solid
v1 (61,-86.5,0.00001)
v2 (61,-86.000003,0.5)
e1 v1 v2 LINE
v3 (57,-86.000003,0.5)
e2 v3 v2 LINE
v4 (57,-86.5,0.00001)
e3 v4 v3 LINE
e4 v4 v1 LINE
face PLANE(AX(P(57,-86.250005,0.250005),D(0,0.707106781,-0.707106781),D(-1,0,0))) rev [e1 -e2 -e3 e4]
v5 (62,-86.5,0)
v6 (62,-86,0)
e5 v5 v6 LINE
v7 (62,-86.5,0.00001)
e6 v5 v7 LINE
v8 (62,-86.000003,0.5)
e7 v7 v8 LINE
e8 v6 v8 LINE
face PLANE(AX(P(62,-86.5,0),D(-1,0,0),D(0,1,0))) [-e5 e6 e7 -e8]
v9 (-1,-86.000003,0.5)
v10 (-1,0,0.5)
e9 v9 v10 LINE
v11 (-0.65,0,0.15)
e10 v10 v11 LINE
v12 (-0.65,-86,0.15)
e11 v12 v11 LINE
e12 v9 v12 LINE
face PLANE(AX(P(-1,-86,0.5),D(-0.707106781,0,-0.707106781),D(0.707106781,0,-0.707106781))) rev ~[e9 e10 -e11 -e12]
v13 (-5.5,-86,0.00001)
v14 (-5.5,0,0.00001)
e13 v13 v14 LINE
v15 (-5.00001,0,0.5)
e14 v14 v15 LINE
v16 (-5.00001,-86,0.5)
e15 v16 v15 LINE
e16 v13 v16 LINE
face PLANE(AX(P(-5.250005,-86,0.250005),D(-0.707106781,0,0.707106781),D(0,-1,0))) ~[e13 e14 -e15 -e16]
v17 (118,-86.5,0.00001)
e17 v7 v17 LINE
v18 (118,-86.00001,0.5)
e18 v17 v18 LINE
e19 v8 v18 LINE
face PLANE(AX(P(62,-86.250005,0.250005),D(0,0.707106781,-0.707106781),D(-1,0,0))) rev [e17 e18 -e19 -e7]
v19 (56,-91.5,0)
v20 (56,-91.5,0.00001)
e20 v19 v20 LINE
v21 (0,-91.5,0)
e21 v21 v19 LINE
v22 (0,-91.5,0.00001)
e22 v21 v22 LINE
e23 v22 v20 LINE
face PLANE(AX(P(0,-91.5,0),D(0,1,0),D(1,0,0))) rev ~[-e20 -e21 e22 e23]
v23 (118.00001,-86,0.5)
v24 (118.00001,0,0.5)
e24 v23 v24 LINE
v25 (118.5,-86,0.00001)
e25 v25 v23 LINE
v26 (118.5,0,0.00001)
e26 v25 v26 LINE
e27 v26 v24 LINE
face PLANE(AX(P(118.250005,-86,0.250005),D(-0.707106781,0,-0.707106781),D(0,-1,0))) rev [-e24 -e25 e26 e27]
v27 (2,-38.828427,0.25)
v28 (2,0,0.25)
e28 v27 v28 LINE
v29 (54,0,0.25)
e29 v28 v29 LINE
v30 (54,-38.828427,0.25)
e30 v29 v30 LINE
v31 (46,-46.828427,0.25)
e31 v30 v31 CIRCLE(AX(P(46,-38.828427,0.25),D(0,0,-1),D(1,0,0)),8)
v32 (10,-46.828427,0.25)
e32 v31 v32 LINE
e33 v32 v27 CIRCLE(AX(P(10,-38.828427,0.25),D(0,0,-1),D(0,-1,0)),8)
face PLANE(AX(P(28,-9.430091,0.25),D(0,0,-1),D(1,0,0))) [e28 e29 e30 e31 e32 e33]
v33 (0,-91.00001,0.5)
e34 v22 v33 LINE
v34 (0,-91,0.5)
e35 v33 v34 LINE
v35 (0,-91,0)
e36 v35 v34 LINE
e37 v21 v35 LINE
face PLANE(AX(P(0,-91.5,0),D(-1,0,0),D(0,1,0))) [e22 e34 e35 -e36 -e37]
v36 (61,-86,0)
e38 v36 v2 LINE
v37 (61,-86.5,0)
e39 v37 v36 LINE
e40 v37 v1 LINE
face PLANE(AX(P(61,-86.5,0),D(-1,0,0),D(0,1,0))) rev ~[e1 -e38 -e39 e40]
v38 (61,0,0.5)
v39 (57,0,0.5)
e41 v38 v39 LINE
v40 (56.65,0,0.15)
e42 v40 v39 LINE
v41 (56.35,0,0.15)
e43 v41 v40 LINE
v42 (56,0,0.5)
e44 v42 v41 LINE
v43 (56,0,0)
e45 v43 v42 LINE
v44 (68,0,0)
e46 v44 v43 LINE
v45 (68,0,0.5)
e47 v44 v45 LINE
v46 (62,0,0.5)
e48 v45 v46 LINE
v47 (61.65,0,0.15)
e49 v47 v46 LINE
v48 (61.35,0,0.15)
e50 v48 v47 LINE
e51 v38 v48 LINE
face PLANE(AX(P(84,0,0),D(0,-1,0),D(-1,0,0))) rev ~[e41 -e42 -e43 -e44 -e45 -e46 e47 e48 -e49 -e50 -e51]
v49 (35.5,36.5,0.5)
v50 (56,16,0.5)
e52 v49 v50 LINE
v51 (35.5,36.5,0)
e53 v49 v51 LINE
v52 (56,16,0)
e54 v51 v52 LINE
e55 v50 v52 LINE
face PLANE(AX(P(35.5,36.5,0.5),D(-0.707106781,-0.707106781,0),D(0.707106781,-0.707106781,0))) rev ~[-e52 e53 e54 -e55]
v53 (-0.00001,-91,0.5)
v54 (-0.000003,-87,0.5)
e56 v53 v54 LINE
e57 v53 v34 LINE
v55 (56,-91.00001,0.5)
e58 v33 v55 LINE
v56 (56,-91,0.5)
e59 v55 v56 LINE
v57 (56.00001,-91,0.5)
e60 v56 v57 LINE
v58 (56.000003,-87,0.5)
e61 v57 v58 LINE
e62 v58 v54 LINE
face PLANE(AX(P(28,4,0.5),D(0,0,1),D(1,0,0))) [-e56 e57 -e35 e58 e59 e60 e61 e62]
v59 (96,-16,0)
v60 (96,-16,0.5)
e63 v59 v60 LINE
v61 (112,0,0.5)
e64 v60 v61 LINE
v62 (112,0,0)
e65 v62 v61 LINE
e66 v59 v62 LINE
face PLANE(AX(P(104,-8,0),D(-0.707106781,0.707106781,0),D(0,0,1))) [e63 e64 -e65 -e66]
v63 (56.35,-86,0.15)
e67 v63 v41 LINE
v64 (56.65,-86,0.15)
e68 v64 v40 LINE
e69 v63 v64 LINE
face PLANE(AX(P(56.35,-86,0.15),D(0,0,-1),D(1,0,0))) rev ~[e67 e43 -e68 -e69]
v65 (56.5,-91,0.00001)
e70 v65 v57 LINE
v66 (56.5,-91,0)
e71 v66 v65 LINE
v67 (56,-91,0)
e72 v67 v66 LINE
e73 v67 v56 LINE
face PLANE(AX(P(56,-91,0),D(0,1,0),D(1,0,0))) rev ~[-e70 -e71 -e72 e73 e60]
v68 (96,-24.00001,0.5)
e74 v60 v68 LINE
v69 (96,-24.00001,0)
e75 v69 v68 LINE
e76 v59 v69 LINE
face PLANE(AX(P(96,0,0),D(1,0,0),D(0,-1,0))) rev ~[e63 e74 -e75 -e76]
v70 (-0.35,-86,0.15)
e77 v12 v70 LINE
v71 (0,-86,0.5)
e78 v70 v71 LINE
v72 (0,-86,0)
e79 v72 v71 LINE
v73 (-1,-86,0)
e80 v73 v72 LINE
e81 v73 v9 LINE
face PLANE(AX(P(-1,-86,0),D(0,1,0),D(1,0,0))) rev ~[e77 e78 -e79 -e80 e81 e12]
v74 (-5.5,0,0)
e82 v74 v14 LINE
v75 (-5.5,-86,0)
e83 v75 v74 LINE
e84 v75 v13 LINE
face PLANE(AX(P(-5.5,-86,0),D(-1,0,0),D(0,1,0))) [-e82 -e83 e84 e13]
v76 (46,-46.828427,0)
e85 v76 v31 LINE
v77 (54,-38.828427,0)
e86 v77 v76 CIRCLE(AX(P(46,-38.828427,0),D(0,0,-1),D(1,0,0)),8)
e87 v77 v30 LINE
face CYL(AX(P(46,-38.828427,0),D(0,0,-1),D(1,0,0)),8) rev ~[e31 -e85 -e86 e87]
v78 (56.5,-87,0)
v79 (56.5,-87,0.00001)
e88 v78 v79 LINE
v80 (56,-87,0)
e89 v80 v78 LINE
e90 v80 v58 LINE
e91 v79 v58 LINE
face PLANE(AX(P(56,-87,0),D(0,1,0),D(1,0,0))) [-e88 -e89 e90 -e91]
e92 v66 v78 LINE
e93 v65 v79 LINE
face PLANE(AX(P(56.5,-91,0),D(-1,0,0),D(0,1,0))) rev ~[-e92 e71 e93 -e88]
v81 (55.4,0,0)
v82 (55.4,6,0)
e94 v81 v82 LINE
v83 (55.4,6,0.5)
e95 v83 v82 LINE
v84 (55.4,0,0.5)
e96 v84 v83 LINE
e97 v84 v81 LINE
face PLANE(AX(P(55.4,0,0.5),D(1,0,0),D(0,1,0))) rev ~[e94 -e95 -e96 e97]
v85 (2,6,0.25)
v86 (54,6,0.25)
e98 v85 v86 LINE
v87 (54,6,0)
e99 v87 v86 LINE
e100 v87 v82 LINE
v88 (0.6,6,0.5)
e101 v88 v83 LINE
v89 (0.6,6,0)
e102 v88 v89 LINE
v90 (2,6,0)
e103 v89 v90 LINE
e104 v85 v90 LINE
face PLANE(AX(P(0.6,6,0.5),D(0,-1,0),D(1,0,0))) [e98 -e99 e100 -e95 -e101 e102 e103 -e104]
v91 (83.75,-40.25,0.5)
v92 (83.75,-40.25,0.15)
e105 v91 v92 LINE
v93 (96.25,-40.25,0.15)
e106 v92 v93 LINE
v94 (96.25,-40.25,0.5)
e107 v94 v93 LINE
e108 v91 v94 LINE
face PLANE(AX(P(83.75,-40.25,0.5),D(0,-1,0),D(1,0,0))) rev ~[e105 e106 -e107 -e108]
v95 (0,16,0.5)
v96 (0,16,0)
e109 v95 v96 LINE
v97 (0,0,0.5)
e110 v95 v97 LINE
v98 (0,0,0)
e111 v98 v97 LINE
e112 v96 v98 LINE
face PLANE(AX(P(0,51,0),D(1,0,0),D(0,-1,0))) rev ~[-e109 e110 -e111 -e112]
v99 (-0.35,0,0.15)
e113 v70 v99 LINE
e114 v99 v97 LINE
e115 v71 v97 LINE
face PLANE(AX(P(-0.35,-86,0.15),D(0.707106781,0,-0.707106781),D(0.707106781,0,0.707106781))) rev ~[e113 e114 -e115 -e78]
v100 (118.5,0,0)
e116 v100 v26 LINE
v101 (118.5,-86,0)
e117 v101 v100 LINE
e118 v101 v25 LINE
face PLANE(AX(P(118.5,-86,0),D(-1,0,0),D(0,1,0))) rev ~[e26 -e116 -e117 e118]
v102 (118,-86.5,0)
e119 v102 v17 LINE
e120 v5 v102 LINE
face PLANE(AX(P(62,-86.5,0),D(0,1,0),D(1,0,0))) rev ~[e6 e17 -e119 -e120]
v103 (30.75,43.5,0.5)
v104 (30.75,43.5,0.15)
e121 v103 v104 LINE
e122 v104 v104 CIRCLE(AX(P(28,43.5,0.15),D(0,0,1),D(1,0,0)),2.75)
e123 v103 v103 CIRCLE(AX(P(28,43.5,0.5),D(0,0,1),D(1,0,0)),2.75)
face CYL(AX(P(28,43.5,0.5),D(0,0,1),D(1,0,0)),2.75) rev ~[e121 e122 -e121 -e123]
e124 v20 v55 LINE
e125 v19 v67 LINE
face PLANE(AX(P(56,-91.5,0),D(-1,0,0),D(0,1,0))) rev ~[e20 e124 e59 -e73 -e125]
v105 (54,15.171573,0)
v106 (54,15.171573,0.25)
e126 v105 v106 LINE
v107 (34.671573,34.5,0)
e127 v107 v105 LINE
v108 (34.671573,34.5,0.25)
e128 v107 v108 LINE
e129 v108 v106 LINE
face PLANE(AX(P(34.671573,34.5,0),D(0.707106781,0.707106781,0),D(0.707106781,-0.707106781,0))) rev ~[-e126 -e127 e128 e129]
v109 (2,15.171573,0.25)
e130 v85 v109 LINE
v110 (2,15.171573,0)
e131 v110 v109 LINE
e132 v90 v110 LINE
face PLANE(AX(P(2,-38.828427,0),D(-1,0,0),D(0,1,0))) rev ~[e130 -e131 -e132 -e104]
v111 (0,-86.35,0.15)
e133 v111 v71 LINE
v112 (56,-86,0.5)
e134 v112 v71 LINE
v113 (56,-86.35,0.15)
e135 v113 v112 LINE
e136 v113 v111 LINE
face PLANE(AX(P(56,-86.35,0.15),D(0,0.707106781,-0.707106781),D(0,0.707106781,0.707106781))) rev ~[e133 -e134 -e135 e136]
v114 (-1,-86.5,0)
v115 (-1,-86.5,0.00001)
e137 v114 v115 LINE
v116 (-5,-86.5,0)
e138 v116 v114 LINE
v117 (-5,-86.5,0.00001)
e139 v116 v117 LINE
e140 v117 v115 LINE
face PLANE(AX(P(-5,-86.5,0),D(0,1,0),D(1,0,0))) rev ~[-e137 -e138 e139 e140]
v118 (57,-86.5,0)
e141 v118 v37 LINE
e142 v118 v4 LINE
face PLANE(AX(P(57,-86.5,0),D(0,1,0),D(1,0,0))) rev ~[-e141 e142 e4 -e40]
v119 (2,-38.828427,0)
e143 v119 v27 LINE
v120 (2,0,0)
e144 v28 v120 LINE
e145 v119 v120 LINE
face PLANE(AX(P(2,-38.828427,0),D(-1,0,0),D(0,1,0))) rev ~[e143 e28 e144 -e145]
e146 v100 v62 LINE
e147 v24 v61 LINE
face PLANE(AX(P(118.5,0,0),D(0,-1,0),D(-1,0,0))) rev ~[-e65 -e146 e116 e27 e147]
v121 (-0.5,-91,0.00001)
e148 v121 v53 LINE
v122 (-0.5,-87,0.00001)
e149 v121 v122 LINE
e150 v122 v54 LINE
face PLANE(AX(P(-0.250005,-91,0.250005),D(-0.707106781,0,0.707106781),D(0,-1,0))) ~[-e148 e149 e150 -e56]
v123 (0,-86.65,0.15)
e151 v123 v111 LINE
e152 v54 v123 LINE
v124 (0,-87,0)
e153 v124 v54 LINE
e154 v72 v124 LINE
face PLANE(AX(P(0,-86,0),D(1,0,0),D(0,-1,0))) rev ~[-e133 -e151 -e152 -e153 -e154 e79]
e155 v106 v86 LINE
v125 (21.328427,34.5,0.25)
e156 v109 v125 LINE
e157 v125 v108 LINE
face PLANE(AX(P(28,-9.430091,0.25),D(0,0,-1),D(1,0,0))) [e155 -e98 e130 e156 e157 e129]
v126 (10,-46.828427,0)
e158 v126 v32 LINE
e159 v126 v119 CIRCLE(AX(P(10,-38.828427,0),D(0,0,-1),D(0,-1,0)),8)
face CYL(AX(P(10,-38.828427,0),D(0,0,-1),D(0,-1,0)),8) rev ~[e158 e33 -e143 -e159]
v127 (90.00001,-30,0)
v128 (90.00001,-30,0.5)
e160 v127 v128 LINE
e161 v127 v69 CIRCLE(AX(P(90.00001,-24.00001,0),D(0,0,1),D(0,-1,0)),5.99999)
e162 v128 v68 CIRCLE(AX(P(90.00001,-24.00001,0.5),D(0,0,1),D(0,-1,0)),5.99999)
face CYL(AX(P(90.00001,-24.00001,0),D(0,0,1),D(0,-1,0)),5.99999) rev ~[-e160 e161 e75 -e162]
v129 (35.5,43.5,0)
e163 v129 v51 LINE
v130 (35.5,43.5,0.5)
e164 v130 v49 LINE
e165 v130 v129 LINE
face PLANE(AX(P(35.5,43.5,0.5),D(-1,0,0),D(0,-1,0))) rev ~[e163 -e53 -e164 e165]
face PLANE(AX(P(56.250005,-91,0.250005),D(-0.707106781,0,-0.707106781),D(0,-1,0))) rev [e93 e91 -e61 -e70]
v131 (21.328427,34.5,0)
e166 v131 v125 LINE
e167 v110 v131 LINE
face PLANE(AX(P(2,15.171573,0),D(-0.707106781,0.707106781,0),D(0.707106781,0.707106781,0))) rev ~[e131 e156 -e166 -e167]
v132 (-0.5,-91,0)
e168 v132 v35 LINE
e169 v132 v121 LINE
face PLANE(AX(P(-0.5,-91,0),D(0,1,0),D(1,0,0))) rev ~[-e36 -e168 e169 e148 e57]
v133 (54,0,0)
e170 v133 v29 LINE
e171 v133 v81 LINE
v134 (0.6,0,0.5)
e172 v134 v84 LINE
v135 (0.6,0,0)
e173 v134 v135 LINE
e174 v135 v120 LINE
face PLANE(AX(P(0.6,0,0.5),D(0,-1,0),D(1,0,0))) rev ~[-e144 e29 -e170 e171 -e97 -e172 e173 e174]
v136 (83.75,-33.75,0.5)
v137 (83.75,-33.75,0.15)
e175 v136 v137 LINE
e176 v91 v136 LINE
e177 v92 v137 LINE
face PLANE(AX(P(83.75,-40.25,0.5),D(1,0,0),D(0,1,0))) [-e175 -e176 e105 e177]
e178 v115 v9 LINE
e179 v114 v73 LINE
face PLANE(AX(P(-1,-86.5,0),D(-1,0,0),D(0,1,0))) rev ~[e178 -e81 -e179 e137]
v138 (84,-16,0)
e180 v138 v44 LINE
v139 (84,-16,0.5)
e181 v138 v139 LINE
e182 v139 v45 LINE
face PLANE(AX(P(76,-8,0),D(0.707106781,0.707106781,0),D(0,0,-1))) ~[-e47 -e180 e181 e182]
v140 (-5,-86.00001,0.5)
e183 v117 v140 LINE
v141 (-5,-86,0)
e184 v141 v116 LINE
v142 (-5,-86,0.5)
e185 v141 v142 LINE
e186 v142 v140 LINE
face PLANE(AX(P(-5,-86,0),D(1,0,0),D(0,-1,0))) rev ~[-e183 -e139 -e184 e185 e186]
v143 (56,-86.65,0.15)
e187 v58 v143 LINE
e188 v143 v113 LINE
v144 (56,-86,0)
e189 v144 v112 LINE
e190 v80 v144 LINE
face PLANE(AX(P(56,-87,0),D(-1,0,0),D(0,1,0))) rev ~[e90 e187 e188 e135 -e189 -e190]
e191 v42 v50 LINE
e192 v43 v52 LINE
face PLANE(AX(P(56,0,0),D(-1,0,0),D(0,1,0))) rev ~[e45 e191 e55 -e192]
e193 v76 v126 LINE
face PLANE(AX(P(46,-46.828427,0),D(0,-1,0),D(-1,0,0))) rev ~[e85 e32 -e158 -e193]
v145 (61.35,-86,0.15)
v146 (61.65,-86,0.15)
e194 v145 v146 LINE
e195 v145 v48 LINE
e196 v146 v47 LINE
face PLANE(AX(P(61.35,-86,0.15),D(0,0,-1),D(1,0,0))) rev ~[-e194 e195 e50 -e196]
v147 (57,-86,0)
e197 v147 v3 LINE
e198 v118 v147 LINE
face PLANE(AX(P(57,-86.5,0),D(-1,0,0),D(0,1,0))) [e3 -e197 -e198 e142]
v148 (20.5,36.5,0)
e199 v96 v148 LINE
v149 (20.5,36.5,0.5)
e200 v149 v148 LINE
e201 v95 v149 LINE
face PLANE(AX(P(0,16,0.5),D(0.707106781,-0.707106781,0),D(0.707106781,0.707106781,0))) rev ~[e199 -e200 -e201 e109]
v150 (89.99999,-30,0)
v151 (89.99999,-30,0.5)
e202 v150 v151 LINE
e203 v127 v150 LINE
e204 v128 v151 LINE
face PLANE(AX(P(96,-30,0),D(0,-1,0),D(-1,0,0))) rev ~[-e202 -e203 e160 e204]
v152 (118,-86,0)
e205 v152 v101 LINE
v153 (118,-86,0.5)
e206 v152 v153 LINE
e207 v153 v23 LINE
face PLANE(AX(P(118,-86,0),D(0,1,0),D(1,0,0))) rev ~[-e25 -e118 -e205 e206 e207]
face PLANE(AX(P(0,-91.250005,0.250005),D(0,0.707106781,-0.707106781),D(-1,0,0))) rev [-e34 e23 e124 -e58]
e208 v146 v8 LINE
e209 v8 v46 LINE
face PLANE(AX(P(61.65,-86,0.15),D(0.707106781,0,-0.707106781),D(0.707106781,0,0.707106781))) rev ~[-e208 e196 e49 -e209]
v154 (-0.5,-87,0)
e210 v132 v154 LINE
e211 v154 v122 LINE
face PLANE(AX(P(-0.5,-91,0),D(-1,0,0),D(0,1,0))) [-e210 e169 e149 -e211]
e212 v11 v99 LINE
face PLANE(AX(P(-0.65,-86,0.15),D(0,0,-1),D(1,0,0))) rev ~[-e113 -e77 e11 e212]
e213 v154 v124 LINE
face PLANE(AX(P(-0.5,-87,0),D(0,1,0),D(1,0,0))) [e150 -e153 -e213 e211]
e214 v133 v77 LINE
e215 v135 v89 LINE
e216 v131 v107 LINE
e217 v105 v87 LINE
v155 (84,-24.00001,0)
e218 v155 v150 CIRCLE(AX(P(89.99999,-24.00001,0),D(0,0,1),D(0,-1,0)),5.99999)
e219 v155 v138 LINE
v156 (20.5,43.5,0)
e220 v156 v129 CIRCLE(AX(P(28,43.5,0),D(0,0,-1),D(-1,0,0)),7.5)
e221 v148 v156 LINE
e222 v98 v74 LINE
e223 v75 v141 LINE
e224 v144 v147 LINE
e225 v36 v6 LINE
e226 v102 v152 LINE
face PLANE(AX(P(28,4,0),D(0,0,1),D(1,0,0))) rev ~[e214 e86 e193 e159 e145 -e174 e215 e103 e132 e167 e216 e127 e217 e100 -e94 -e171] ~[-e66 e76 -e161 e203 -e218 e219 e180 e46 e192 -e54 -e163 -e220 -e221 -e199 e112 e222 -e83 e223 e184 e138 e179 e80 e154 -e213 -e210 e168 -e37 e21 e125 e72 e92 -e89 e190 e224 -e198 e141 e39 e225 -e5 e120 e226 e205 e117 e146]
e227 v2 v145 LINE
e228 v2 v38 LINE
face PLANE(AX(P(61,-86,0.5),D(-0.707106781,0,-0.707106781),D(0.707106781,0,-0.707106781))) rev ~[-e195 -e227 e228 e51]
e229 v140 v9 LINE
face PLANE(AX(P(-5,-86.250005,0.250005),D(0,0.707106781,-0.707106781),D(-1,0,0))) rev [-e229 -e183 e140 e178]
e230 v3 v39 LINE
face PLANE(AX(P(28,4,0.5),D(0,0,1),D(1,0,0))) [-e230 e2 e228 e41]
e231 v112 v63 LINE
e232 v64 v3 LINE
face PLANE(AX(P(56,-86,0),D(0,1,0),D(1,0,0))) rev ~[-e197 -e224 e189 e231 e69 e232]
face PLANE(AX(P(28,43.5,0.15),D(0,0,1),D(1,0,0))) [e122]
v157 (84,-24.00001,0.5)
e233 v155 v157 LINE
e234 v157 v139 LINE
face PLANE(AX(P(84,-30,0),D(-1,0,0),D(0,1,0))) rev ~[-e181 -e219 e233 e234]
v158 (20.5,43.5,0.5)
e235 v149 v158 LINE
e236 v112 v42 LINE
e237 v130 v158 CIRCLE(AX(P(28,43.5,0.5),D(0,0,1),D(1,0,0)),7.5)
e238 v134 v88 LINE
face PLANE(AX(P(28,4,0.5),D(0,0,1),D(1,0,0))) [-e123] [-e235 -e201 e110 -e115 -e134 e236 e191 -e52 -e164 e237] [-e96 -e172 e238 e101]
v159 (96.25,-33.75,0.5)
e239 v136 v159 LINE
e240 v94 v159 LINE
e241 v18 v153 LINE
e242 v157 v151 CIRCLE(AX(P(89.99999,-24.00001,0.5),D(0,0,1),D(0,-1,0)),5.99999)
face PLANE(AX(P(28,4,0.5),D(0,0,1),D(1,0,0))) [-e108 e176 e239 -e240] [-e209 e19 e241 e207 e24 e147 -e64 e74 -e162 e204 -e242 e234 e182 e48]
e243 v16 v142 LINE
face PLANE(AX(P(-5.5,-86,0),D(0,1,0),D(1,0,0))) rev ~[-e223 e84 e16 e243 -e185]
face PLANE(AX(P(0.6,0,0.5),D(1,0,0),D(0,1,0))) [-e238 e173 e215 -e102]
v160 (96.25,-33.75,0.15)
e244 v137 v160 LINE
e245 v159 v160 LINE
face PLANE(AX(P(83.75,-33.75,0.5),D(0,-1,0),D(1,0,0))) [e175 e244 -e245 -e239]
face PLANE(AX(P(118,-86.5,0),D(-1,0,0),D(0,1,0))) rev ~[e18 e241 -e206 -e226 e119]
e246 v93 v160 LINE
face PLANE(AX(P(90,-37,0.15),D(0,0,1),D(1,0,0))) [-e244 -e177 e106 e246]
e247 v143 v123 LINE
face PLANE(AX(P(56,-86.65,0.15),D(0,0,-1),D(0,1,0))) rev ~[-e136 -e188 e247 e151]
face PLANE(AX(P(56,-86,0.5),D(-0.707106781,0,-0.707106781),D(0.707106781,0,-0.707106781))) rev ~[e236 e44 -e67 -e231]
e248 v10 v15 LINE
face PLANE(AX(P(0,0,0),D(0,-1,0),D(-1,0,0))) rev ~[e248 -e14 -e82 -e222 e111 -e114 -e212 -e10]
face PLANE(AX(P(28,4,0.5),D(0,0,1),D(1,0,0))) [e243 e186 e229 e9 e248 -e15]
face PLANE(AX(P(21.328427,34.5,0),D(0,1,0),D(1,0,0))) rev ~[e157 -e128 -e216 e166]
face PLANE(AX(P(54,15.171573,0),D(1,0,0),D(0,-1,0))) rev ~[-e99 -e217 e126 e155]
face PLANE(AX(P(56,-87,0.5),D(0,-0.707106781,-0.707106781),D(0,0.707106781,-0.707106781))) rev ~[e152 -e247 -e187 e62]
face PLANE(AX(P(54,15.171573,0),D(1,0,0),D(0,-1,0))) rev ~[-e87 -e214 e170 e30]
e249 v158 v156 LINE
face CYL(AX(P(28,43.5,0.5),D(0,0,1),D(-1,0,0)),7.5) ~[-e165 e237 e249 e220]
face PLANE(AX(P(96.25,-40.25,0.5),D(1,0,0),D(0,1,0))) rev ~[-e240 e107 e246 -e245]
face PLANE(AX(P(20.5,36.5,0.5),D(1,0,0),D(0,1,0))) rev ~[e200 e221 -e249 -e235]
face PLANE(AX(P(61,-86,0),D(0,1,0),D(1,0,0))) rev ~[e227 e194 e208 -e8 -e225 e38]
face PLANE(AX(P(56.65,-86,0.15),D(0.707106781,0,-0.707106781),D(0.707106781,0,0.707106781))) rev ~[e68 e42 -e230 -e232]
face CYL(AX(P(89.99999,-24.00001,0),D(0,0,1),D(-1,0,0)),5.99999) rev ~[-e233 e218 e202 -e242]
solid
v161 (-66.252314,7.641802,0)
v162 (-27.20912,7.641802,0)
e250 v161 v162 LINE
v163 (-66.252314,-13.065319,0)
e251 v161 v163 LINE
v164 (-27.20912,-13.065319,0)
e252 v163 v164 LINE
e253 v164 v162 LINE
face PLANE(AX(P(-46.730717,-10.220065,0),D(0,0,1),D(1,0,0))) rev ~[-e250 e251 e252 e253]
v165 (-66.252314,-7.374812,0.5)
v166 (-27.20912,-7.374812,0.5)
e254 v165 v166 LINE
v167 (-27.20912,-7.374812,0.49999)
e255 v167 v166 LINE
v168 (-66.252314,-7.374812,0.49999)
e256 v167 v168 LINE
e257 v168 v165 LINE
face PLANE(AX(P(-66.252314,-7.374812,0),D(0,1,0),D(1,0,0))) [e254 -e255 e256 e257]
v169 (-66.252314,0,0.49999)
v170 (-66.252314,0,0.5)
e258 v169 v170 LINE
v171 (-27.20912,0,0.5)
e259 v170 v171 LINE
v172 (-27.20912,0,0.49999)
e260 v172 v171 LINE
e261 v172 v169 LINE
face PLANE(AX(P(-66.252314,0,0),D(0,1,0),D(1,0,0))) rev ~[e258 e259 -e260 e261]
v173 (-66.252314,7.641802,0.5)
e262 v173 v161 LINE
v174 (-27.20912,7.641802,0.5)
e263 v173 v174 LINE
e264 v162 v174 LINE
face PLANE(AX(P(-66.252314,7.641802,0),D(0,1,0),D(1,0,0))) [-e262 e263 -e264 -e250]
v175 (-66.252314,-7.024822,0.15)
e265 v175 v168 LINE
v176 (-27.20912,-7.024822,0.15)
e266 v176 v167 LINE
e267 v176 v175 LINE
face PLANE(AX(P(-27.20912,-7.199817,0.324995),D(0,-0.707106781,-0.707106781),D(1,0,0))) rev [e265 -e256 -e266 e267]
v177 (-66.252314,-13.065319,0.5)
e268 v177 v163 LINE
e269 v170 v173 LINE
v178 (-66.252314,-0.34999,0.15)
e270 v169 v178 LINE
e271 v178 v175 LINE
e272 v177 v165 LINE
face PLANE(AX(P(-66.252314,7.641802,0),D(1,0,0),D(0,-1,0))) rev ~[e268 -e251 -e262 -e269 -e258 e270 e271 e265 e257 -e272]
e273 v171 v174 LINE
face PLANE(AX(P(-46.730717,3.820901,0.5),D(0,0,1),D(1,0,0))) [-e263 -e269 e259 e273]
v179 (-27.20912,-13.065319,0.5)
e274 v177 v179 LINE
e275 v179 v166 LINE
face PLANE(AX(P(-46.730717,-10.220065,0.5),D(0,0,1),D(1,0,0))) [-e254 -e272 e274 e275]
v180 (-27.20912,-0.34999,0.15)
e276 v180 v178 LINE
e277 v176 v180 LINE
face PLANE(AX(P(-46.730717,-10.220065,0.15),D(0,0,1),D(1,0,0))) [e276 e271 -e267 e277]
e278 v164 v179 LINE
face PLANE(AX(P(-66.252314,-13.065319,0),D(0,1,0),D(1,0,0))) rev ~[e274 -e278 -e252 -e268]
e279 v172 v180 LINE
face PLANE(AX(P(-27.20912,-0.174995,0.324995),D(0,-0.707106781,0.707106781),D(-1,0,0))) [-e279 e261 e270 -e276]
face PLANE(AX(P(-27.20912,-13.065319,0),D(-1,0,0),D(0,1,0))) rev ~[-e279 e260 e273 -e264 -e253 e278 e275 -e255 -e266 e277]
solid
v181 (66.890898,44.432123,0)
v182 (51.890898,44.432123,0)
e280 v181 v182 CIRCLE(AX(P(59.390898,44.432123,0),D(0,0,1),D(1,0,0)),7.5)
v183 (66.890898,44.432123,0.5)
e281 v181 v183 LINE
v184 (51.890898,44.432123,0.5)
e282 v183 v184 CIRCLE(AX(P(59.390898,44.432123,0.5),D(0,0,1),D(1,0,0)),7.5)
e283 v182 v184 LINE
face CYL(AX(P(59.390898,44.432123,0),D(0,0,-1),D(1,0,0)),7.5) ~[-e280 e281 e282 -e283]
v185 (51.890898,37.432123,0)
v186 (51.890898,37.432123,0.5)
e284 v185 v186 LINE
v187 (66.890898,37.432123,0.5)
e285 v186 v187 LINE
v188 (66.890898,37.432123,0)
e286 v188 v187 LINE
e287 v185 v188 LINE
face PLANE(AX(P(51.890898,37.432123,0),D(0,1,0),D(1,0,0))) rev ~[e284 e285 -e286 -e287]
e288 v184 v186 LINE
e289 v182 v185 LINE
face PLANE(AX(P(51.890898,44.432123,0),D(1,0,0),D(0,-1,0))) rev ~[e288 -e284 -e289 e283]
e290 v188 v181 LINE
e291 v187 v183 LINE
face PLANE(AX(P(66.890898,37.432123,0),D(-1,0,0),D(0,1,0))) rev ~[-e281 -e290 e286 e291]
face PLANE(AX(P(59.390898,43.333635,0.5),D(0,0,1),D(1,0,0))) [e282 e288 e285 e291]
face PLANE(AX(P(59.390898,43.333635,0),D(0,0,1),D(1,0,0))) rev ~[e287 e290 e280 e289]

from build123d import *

# Parameters (mm, degrees)
F0_W      = 56
F0_H      = 8
F0_H_2    = 86
F0_W_2    = 0.5
F0_H_3    = 0.5
F0_H_4    = 43
F0_W_3    = 4
F0_H_5    = 4
F1_DEPTH  = 0.5
F2_SIZE2  = 0.49999
F2_SIZE   = 0.49999
F4_DEPTH  = 86
F6_DEPTH  = 25
F7_R      = 2.75
F8_DEPTH  = 0.35
F9_W      = 12.5
F9_H      = 6.5
F10_DEPTH = 0.35
F11_W     = 39.043193683
F11_H     = 5.6905061938
F11_H_2   = 7.6418016106
F11_H_3   = 7.3748123832
F12_DEPTH = 0.15
F13_DEPTH = 0.5
F14_SIZE  = 0.34999
F15_W     = 54.8
F15_H     = 6
F16_DEPTH = 25
F17_R     = 5.99999
F18_SIZE  = 16
F20_DEPTH = 56
F22_DEPTH = 0.5
F25_DEPTH = 0.25


# Not quite as in the source:
# - a fillet or chamfer is up to 0.001 mm smaller than in the source, because OpenCascade refuses the exact size


with BuildPart() as f1:
    # F0 (on Top) → F1 (new body)
    with BuildSketch(Plane.XY):
        with Locations((28, 4)):
            Rectangle(F0_W, F0_H)
        with Locations((28, -43)):
            Rectangle(F0_W, F0_H_2)
        with Locations((-0.25, -43)):
            Rectangle(F0_W_2, F0_H_2)
        with Locations((56.25, -43)):
            Rectangle(F0_W_2, F0_H_2)
        with Locations((28, -86.25)):
            Rectangle(F0_W, F0_H_3)
        with Locations((-0.75, -43)):
            Rectangle(F0_W_2, F0_H_2)
        with Locations((28, 29.5)):
            Rectangle(F0_W, F0_H_4)
        with Locations((56.75, -43)):
            Rectangle(F0_W_2, F0_H_2)
        with Locations((28, -86.75)):
            Rectangle(F0_W, F0_H_3)
        with Locations((-3, -43)):
            Rectangle(F0_W_3, F0_H_2)
        with Locations((59, -43)):
            Rectangle(F0_W_3, F0_H_2)
        with Locations((-3, -86.25)):
            Rectangle(F0_W_3, F0_H_3)
        with Locations((28, -89)):
            Rectangle(F0_W, F0_H_5)
        with Locations((-0.25, -89)):
            Rectangle(F0_W_2, F0_H_5)
        with Locations((-5.25, -43)):
            Rectangle(F0_W_2, F0_H_2)
        with Locations((59, -86.25)):
            Rectangle(F0_W_3, F0_H_3)
        with Locations((56.25, -89)):
            Rectangle(F0_W_2, F0_H_5)
        with Locations((61.25, -43)):
            Rectangle(F0_W_2, F0_H_2)
        with Locations((28, -91.25)):
            Rectangle(F0_W, F0_H_3)
        with Locations((61.75, -43)):
            Rectangle(F0_W_2, F0_H_2)
        Polygon((84, 0), (62, 0), (62, -86), (118, -86), (118, 0), (96, 0), (96, -30), (84, -30), align=None)
        with Locations((90, -86.25)):
            Rectangle(F0_W, F0_H_3)
        with Locations((118.25, -43)):
            Rectangle(F0_W_2, F0_H_2)
    extrude(amount=F1_DEPTH)

    # F2 (size 0.5 and 0.5 in the source; OpenCascade refuses exactly that, so slightly less here)
    f2_edges = [f1.edges().sort_by_distance(p)[0] for p in [
        (-5.5, -43, 0.5),
        (-3, -86.5, 0.5),
        (-0.5, -89, 0.5),
        (28, -91.5, 0.5),
        (56.5, -89, 0.5),
        (59, -86.5, 0.5),
        (90, -86.5, 0.5),
        (118.5, -43, 0.5),
    ]]
    chamfer(f2_edges, length=F2_SIZE, length2=F2_SIZE2)

    # F3 (on face) → F4 (cut, through all)
    with BuildSketch(Plane.XZ.offset(86)):
        Polygon((0, 0.5), (-1, 0.5), (-0.65, 0.15), (-0.35, 0.15), align=None)
        Polygon((57, 0.5), (56, 0.5), (56.35, 0.15), (56.65, 0.15), align=None)
        Polygon((62, 0.5), (61, 0.5), (61.35, 0.15), (61.65, 0.15), align=None)
    extrude(amount=-F4_DEPTH, mode=Mode.SUBTRACT)

    # F5 (on face) → F6 (cut)
    with BuildSketch(Plane.XY.offset(0.5)):
        with BuildLine():
            Line((34, 51), (28, 51))
            ThreePointArc((28, 51), (33.3033008589, 48.8033008589), (35.5, 43.5))
            Line((35.5, 43.5), (35.5, 36.5))
            Line((35.5, 36.5), (56, 16))
            Line((56, 16), (56, 51))
            Line((56, 51), (34, 51))
        make_face()
        with BuildLine():
            Line((28, 51), (22, 51))
            Line((22, 51), (0, 51))
            Line((0, 51), (0, 16))
            Line((0, 16), (20.5, 36.5))
            Line((20.5, 36.5), (20.5, 43.5))
            ThreePointArc((20.5, 43.5), (22.6966991411, 48.8033008589), (28, 51))
        make_face()
    extrude(amount=-F6_DEPTH, mode=Mode.SUBTRACT)

    # F7 (on face) → F8 (cut)
    with BuildSketch(Plane.XY.offset(0.5)):
        with Locations((28, 43.5)):
            Circle(F7_R)
    extrude(amount=-F8_DEPTH, mode=Mode.SUBTRACT)

    # F9 (on face) → F10 (cut)
    with BuildSketch(Plane.XY.offset(0.5)):
        with Locations((90, -37)):
            Rectangle(F9_W, F9_H)
    extrude(amount=-F10_DEPTH, mode=Mode.SUBTRACT)

    # F15 (on face) → F16 (cut)
    with BuildSketch(Plane.XY.offset(0.5)):
        with Locations((28, 3)):
            Rectangle(F15_W, F15_H)
    extrude(amount=-F16_DEPTH, mode=Mode.SUBTRACT)

    # F17 (radius 6 in the source; OpenCascade refuses exactly that, so slightly less here)
    f17_edges = [f1.edges().sort_by_distance(p)[0] for p in [
        (84, -30, 0.25),
        (96, -30, 0.25),
    ]]
    fillet(f17_edges, radius=F17_R)

    # F18
    f18_edges = [f1.edges().sort_by_distance(p)[0] for p in [
        (84, 0, 0.25),
        (96, 0, 0.25),
    ]]
    chamfer(f18_edges, length=F18_SIZE)

    # F19 (on face) → F20 (cut, through all)
    with BuildSketch(Plane.YZ.offset(56)):
        Polygon((-86, 0.5), (-87, 0.5), (-86.65, 0.15), (-86.35, 0.15), align=None)
    extrude(amount=-F20_DEPTH, mode=Mode.SUBTRACT)

    # F24 (on face) → F25 (cut)
    with BuildSketch(Plane(origin=(0, 0, 0), x_dir=(1, 0, 0), z_dir=(0, 0, -1))):
        with BuildLine():
            Line((54, -15.1715728753), (54, 38.8284271247))
            ThreePointArc((54, 38.8284271247), (51.6568542495, 44.4852813742), (46, 46.8284271247))
            Line((46, 46.8284271247), (10, 46.8284271247))
            ThreePointArc((10, 46.8284271247), (4.3431457505, 44.4852813742), (2, 38.8284271247))
            Line((2, 38.8284271247), (2, -15.1715728753))
            Line((2, -15.1715728753), (21.3284271247, -34.5))
            Line((21.3284271247, -34.5), (34.6715728753, -34.5))
            Line((34.6715728753, -34.5), (54, -15.1715728753))
        make_face()
    extrude(amount=-F25_DEPTH, mode=Mode.SUBTRACT)


with BuildPart() as f12:
    # F11 (on Top) → F12 (new body)
    with BuildSketch(Plane.XY):
        with Locations((-46.7307167128, -10.2200654801)):
            Rectangle(F11_W, F11_H)
        with Locations((-46.7307167128, 3.8209008053)):
            Rectangle(F11_W, F11_H_2)
        with Locations((-46.7307167128, -3.6874061916)):
            Rectangle(F11_W, F11_H_3)
    extrude(amount=F12_DEPTH)

    # F11 (on Top) → F13 (join)
    with BuildSketch(Plane.XY):
        with Locations((-46.7307167128, -10.2200654801)):
            Rectangle(F11_W, F11_H)
        with Locations((-46.7307167128, 3.8209008053)):
            Rectangle(F11_W, F11_H_2)
    extrude(amount=F13_DEPTH)

    # F14 (size 0.35 in the source; OpenCascade refuses exactly that, so slightly less here)
    f14_edges = [f12.edges().sort_by_distance(p)[0] for p in [
        (-46.730717, -7.374812, 0.15),
        (-46.730717, 0, 0.15),
    ]]
    chamfer(f14_edges, length=F14_SIZE)


with BuildPart() as f22:
    # F21 (on Top) → F22 (new body)
    with BuildSketch(Plane.XY):
        with BuildLine():
            Line((51.8908984959, 44.4321229756), (51.8908984959, 37.4321229756))
            Line((51.8908984959, 37.4321229756), (66.8908984959, 37.4321229756))
            Line((66.8908984959, 37.4321229756), (66.8908984959, 44.4321229756))
            ThreePointArc((66.8908984959, 44.4321229756), (59.3908984959, 51.9321229756), (51.8908984959, 44.4321229756))
        make_face()
    extrude(amount=F22_DEPTH)


solid = Compound([f1.part, f12.part, f22.part])
